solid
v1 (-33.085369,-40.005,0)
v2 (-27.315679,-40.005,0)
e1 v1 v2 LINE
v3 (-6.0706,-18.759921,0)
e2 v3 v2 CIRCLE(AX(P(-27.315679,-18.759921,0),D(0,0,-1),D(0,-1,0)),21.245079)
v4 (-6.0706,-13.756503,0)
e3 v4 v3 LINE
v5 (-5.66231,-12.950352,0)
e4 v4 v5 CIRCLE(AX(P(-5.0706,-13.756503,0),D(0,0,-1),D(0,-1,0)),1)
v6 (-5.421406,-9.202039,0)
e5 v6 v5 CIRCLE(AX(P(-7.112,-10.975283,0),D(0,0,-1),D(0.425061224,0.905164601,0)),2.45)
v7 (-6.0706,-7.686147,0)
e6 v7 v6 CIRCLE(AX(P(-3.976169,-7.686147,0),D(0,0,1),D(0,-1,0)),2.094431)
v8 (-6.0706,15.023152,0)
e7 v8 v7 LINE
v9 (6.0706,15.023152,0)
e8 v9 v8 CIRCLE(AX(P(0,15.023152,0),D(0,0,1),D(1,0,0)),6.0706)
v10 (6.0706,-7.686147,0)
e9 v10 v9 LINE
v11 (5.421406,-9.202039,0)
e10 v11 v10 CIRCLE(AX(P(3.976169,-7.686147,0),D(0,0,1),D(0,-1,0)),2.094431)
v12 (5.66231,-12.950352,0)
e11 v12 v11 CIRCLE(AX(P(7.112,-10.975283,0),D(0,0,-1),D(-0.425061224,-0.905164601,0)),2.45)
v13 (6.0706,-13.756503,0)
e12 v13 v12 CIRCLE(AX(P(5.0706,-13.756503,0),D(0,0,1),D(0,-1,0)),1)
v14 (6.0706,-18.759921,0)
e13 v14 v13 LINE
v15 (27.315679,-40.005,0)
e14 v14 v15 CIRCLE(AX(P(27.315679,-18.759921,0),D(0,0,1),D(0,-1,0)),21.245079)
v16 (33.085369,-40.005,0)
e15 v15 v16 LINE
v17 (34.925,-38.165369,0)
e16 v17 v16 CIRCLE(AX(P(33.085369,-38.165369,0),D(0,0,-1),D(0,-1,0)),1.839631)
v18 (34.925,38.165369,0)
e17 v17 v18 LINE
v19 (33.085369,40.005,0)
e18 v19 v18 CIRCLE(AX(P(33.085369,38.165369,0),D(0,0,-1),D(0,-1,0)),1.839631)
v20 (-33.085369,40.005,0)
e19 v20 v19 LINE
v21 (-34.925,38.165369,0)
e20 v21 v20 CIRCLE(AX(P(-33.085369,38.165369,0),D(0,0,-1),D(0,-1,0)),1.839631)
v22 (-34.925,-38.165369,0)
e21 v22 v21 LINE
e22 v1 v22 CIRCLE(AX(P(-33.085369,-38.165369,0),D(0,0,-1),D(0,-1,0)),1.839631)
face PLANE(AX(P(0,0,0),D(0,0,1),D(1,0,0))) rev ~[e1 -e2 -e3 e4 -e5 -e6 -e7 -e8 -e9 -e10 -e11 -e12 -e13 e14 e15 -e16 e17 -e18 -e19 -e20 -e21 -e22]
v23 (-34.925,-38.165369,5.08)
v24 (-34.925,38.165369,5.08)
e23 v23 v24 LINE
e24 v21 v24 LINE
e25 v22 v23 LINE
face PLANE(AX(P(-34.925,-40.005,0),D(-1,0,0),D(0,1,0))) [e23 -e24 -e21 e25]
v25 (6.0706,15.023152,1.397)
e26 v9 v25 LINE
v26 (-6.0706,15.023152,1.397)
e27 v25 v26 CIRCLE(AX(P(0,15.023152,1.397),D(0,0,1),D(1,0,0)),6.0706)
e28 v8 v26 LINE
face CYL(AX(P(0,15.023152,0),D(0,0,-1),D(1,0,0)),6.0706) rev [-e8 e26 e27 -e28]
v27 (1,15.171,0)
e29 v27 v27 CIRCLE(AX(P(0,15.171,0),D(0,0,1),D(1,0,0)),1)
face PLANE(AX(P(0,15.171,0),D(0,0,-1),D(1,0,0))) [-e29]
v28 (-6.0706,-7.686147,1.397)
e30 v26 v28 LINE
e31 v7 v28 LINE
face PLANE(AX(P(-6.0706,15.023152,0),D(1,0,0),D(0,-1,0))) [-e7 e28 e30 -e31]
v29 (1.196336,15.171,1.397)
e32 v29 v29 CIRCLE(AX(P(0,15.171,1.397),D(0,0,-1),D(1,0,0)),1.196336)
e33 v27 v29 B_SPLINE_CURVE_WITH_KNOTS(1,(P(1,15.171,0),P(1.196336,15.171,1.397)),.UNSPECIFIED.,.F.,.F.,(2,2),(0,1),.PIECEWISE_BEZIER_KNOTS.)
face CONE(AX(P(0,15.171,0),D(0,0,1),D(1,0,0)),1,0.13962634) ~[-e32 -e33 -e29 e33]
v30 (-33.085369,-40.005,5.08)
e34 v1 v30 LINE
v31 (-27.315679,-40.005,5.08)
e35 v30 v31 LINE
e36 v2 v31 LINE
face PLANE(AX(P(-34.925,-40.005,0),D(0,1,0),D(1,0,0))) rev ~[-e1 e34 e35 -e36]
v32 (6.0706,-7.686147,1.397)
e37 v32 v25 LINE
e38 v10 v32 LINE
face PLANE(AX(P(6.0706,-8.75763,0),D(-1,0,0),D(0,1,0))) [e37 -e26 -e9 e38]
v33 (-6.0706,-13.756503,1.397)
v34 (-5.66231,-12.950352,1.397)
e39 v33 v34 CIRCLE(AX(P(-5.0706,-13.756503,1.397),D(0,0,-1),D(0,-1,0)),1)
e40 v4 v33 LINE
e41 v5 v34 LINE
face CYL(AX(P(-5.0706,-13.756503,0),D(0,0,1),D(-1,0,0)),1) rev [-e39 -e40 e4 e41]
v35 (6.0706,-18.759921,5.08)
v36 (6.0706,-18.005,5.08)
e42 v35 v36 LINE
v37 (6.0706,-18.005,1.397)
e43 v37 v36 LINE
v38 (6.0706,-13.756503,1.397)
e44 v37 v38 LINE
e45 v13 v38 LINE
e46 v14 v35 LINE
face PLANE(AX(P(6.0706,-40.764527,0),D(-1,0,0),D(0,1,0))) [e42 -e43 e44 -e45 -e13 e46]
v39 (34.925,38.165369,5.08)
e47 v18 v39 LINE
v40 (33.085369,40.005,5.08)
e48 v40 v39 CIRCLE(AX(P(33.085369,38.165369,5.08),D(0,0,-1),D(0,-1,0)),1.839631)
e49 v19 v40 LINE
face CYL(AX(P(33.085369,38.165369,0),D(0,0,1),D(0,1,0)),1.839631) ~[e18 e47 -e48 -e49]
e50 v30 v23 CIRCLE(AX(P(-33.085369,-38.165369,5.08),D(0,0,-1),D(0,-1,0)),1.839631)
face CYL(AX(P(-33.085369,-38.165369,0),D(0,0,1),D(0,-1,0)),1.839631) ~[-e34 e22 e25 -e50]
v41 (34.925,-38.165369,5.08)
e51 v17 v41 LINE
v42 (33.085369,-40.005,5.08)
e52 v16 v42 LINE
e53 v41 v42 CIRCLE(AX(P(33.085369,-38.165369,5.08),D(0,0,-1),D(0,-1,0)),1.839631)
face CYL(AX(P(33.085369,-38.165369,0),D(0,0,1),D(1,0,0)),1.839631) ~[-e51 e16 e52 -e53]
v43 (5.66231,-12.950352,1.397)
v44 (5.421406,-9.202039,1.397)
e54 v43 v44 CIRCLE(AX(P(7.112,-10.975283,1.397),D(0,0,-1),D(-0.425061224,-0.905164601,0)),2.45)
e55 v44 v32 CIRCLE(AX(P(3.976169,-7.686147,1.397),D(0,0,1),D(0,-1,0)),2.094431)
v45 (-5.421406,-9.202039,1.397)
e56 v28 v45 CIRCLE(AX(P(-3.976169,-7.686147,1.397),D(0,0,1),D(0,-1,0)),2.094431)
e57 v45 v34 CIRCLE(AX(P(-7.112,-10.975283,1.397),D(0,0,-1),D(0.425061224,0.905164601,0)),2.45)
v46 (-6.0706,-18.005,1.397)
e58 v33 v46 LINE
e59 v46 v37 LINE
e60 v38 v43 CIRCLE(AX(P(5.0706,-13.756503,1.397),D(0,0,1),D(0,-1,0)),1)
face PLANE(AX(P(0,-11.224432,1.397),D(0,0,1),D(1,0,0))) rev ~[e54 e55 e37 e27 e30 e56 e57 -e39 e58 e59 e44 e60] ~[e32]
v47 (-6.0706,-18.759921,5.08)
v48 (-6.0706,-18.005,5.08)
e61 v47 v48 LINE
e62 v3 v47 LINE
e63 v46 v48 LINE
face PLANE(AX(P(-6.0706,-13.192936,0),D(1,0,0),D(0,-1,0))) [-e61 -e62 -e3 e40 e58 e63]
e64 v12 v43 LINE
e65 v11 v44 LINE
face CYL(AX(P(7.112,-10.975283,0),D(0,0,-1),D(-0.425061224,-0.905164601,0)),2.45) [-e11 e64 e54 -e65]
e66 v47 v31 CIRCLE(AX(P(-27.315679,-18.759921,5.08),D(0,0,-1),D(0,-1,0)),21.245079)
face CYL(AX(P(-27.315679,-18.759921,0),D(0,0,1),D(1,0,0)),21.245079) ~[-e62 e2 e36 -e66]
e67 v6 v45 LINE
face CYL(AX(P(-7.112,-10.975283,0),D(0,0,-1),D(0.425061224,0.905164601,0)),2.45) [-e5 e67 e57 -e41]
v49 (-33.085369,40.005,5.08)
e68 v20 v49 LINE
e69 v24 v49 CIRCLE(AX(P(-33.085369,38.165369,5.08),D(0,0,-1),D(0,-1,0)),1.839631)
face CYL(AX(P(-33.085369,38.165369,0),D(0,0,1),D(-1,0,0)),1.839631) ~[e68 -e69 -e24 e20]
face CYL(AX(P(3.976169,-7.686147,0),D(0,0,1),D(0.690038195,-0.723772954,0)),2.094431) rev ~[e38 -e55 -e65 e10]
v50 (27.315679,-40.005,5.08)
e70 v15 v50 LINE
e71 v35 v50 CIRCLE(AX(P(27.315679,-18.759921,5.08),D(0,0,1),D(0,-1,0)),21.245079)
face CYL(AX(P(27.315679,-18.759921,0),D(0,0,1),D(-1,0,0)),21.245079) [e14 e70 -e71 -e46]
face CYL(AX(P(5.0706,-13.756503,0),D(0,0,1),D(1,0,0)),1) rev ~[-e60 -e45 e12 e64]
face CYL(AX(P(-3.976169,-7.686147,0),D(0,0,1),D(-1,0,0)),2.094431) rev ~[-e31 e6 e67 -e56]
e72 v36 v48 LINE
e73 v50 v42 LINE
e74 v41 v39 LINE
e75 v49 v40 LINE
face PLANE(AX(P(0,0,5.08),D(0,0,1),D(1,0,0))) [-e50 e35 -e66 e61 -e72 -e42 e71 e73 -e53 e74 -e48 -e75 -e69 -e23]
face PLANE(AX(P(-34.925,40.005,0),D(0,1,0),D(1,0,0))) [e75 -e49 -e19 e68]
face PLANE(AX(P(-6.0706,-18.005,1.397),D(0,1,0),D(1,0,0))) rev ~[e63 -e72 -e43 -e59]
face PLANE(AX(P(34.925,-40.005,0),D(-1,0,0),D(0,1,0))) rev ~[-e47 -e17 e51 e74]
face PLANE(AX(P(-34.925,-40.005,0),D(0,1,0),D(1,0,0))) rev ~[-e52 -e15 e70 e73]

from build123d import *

# Parameters (mm, degrees)
F0_W     = 69.85
F0_H     = 80.01
F1_DEPTH = 5.08
F3_DEPTH = 1.397
F4_R     = 1
F5_R     = 1
F6_DEPTH = 1.397
F6_TAPER = -8
F7_W     = 12.1412
F7_H     = 22
F8_DEPTH = 3.684
F9_R     = 1.8396307345
F10_R    = 2.0944308897
F11_R    = 21.2450793489


with BuildPart() as f1:
    # F0 (on Top) → F1 (new body)
    with BuildSketch(Plane.XY):
        Rectangle(F0_W, F0_H)
    extrude(amount=F1_DEPTH)

    # F2 (on Top) → F3 (cut)
    with BuildSketch(Plane.XY):
        with BuildLine():
            ThreePointArc((6.0706, 15.0231522067), (0, 21.0937522067), (-6.0706, 15.0231522067))
            Line((-6.0706, 15.0231522067), (-6.0706, -3.937))
            Line((-6.0706, -3.937), (-6.0706, -8.7576295534))
            ThreePointArc((-6.0706, -8.7576295534), (-4.662, -10.9752828266), (-6.0706, -13.1929360997))
            Line((-6.0706, -13.1929360997), (-6.0706, -17.907))
            Line((-6.0706, -17.907), (-6.0706, -40.7645274005))
            Line((-6.0706, -40.7645274005), (6.0706, -40.7645274005))
            Line((6.0706, -40.7645274005), (6.0706, -13.1929360997))
            ThreePointArc((6.0706, -13.1929360997), (4.662, -10.9752828266), (6.0706, -8.7576295534))
            Line((6.0706, -8.7576295534), (6.0706, -3.937))
            Line((6.0706, -3.937), (6.0706, 15.0231522067))
        make_face()
    extrude(amount=F3_DEPTH, mode=Mode.SUBTRACT)

    # F4
    f4_edges = [f1.edges().sort_by_distance(p)[0] for p in [
        (-6.0706, -13.192936, 0.6985),
        (6.0706, -13.192936, 0.6985),
    ]]
    fillet(f4_edges, radius=F4_R)

    # F5 (on face) → F6 (join, through all)
    with BuildSketch(Plane(origin=(0, 0, 0), x_dir=(1, 0, 0), z_dir=(0, 0, -1))):
        with Locations((0, -15.171)):
            Circle(F5_R)
    extrude(amount=-F6_DEPTH, taper=F6_TAPER)

    # F7 (on face) → F8 (cut, through all)
    with BuildSketch(Plane(origin=(0, 0, 1.397), x_dir=(1, 0, 0), z_dir=(0, 0, -1))):
        with Locations((0, 29.005)):
            Rectangle(F7_W, F7_H)
    extrude(amount=-F8_DEPTH, mode=Mode.SUBTRACT)

    # F9
    f9_edges = [f1.edges().sort_by_distance(p)[0] for p in [
        (34.925, -40.005, 2.54),
        (-34.925, -40.005, 2.54),
        (-34.925, 40.005, 2.54),
        (34.925, 40.005, 2.54),
    ]]
    fillet(f9_edges, radius=F9_R)

    # F10
    f10_edges = [f1.edges().sort_by_distance(p)[0] for p in [
        (6.0706, -8.75763, 0.6985),
        (-6.0706, -8.75763, 0.6985),
    ]]
    fillet(f10_edges, radius=F10_R)

    # F11
    f11_edges = [f1.edges().sort_by_distance(p)[0] for p in [
        (6.0706, -40.005, 2.54),
        (-6.0706, -40.005, 2.54),
    ]]
    fillet(f11_edges, radius=F11_R)


solid = f1.part
